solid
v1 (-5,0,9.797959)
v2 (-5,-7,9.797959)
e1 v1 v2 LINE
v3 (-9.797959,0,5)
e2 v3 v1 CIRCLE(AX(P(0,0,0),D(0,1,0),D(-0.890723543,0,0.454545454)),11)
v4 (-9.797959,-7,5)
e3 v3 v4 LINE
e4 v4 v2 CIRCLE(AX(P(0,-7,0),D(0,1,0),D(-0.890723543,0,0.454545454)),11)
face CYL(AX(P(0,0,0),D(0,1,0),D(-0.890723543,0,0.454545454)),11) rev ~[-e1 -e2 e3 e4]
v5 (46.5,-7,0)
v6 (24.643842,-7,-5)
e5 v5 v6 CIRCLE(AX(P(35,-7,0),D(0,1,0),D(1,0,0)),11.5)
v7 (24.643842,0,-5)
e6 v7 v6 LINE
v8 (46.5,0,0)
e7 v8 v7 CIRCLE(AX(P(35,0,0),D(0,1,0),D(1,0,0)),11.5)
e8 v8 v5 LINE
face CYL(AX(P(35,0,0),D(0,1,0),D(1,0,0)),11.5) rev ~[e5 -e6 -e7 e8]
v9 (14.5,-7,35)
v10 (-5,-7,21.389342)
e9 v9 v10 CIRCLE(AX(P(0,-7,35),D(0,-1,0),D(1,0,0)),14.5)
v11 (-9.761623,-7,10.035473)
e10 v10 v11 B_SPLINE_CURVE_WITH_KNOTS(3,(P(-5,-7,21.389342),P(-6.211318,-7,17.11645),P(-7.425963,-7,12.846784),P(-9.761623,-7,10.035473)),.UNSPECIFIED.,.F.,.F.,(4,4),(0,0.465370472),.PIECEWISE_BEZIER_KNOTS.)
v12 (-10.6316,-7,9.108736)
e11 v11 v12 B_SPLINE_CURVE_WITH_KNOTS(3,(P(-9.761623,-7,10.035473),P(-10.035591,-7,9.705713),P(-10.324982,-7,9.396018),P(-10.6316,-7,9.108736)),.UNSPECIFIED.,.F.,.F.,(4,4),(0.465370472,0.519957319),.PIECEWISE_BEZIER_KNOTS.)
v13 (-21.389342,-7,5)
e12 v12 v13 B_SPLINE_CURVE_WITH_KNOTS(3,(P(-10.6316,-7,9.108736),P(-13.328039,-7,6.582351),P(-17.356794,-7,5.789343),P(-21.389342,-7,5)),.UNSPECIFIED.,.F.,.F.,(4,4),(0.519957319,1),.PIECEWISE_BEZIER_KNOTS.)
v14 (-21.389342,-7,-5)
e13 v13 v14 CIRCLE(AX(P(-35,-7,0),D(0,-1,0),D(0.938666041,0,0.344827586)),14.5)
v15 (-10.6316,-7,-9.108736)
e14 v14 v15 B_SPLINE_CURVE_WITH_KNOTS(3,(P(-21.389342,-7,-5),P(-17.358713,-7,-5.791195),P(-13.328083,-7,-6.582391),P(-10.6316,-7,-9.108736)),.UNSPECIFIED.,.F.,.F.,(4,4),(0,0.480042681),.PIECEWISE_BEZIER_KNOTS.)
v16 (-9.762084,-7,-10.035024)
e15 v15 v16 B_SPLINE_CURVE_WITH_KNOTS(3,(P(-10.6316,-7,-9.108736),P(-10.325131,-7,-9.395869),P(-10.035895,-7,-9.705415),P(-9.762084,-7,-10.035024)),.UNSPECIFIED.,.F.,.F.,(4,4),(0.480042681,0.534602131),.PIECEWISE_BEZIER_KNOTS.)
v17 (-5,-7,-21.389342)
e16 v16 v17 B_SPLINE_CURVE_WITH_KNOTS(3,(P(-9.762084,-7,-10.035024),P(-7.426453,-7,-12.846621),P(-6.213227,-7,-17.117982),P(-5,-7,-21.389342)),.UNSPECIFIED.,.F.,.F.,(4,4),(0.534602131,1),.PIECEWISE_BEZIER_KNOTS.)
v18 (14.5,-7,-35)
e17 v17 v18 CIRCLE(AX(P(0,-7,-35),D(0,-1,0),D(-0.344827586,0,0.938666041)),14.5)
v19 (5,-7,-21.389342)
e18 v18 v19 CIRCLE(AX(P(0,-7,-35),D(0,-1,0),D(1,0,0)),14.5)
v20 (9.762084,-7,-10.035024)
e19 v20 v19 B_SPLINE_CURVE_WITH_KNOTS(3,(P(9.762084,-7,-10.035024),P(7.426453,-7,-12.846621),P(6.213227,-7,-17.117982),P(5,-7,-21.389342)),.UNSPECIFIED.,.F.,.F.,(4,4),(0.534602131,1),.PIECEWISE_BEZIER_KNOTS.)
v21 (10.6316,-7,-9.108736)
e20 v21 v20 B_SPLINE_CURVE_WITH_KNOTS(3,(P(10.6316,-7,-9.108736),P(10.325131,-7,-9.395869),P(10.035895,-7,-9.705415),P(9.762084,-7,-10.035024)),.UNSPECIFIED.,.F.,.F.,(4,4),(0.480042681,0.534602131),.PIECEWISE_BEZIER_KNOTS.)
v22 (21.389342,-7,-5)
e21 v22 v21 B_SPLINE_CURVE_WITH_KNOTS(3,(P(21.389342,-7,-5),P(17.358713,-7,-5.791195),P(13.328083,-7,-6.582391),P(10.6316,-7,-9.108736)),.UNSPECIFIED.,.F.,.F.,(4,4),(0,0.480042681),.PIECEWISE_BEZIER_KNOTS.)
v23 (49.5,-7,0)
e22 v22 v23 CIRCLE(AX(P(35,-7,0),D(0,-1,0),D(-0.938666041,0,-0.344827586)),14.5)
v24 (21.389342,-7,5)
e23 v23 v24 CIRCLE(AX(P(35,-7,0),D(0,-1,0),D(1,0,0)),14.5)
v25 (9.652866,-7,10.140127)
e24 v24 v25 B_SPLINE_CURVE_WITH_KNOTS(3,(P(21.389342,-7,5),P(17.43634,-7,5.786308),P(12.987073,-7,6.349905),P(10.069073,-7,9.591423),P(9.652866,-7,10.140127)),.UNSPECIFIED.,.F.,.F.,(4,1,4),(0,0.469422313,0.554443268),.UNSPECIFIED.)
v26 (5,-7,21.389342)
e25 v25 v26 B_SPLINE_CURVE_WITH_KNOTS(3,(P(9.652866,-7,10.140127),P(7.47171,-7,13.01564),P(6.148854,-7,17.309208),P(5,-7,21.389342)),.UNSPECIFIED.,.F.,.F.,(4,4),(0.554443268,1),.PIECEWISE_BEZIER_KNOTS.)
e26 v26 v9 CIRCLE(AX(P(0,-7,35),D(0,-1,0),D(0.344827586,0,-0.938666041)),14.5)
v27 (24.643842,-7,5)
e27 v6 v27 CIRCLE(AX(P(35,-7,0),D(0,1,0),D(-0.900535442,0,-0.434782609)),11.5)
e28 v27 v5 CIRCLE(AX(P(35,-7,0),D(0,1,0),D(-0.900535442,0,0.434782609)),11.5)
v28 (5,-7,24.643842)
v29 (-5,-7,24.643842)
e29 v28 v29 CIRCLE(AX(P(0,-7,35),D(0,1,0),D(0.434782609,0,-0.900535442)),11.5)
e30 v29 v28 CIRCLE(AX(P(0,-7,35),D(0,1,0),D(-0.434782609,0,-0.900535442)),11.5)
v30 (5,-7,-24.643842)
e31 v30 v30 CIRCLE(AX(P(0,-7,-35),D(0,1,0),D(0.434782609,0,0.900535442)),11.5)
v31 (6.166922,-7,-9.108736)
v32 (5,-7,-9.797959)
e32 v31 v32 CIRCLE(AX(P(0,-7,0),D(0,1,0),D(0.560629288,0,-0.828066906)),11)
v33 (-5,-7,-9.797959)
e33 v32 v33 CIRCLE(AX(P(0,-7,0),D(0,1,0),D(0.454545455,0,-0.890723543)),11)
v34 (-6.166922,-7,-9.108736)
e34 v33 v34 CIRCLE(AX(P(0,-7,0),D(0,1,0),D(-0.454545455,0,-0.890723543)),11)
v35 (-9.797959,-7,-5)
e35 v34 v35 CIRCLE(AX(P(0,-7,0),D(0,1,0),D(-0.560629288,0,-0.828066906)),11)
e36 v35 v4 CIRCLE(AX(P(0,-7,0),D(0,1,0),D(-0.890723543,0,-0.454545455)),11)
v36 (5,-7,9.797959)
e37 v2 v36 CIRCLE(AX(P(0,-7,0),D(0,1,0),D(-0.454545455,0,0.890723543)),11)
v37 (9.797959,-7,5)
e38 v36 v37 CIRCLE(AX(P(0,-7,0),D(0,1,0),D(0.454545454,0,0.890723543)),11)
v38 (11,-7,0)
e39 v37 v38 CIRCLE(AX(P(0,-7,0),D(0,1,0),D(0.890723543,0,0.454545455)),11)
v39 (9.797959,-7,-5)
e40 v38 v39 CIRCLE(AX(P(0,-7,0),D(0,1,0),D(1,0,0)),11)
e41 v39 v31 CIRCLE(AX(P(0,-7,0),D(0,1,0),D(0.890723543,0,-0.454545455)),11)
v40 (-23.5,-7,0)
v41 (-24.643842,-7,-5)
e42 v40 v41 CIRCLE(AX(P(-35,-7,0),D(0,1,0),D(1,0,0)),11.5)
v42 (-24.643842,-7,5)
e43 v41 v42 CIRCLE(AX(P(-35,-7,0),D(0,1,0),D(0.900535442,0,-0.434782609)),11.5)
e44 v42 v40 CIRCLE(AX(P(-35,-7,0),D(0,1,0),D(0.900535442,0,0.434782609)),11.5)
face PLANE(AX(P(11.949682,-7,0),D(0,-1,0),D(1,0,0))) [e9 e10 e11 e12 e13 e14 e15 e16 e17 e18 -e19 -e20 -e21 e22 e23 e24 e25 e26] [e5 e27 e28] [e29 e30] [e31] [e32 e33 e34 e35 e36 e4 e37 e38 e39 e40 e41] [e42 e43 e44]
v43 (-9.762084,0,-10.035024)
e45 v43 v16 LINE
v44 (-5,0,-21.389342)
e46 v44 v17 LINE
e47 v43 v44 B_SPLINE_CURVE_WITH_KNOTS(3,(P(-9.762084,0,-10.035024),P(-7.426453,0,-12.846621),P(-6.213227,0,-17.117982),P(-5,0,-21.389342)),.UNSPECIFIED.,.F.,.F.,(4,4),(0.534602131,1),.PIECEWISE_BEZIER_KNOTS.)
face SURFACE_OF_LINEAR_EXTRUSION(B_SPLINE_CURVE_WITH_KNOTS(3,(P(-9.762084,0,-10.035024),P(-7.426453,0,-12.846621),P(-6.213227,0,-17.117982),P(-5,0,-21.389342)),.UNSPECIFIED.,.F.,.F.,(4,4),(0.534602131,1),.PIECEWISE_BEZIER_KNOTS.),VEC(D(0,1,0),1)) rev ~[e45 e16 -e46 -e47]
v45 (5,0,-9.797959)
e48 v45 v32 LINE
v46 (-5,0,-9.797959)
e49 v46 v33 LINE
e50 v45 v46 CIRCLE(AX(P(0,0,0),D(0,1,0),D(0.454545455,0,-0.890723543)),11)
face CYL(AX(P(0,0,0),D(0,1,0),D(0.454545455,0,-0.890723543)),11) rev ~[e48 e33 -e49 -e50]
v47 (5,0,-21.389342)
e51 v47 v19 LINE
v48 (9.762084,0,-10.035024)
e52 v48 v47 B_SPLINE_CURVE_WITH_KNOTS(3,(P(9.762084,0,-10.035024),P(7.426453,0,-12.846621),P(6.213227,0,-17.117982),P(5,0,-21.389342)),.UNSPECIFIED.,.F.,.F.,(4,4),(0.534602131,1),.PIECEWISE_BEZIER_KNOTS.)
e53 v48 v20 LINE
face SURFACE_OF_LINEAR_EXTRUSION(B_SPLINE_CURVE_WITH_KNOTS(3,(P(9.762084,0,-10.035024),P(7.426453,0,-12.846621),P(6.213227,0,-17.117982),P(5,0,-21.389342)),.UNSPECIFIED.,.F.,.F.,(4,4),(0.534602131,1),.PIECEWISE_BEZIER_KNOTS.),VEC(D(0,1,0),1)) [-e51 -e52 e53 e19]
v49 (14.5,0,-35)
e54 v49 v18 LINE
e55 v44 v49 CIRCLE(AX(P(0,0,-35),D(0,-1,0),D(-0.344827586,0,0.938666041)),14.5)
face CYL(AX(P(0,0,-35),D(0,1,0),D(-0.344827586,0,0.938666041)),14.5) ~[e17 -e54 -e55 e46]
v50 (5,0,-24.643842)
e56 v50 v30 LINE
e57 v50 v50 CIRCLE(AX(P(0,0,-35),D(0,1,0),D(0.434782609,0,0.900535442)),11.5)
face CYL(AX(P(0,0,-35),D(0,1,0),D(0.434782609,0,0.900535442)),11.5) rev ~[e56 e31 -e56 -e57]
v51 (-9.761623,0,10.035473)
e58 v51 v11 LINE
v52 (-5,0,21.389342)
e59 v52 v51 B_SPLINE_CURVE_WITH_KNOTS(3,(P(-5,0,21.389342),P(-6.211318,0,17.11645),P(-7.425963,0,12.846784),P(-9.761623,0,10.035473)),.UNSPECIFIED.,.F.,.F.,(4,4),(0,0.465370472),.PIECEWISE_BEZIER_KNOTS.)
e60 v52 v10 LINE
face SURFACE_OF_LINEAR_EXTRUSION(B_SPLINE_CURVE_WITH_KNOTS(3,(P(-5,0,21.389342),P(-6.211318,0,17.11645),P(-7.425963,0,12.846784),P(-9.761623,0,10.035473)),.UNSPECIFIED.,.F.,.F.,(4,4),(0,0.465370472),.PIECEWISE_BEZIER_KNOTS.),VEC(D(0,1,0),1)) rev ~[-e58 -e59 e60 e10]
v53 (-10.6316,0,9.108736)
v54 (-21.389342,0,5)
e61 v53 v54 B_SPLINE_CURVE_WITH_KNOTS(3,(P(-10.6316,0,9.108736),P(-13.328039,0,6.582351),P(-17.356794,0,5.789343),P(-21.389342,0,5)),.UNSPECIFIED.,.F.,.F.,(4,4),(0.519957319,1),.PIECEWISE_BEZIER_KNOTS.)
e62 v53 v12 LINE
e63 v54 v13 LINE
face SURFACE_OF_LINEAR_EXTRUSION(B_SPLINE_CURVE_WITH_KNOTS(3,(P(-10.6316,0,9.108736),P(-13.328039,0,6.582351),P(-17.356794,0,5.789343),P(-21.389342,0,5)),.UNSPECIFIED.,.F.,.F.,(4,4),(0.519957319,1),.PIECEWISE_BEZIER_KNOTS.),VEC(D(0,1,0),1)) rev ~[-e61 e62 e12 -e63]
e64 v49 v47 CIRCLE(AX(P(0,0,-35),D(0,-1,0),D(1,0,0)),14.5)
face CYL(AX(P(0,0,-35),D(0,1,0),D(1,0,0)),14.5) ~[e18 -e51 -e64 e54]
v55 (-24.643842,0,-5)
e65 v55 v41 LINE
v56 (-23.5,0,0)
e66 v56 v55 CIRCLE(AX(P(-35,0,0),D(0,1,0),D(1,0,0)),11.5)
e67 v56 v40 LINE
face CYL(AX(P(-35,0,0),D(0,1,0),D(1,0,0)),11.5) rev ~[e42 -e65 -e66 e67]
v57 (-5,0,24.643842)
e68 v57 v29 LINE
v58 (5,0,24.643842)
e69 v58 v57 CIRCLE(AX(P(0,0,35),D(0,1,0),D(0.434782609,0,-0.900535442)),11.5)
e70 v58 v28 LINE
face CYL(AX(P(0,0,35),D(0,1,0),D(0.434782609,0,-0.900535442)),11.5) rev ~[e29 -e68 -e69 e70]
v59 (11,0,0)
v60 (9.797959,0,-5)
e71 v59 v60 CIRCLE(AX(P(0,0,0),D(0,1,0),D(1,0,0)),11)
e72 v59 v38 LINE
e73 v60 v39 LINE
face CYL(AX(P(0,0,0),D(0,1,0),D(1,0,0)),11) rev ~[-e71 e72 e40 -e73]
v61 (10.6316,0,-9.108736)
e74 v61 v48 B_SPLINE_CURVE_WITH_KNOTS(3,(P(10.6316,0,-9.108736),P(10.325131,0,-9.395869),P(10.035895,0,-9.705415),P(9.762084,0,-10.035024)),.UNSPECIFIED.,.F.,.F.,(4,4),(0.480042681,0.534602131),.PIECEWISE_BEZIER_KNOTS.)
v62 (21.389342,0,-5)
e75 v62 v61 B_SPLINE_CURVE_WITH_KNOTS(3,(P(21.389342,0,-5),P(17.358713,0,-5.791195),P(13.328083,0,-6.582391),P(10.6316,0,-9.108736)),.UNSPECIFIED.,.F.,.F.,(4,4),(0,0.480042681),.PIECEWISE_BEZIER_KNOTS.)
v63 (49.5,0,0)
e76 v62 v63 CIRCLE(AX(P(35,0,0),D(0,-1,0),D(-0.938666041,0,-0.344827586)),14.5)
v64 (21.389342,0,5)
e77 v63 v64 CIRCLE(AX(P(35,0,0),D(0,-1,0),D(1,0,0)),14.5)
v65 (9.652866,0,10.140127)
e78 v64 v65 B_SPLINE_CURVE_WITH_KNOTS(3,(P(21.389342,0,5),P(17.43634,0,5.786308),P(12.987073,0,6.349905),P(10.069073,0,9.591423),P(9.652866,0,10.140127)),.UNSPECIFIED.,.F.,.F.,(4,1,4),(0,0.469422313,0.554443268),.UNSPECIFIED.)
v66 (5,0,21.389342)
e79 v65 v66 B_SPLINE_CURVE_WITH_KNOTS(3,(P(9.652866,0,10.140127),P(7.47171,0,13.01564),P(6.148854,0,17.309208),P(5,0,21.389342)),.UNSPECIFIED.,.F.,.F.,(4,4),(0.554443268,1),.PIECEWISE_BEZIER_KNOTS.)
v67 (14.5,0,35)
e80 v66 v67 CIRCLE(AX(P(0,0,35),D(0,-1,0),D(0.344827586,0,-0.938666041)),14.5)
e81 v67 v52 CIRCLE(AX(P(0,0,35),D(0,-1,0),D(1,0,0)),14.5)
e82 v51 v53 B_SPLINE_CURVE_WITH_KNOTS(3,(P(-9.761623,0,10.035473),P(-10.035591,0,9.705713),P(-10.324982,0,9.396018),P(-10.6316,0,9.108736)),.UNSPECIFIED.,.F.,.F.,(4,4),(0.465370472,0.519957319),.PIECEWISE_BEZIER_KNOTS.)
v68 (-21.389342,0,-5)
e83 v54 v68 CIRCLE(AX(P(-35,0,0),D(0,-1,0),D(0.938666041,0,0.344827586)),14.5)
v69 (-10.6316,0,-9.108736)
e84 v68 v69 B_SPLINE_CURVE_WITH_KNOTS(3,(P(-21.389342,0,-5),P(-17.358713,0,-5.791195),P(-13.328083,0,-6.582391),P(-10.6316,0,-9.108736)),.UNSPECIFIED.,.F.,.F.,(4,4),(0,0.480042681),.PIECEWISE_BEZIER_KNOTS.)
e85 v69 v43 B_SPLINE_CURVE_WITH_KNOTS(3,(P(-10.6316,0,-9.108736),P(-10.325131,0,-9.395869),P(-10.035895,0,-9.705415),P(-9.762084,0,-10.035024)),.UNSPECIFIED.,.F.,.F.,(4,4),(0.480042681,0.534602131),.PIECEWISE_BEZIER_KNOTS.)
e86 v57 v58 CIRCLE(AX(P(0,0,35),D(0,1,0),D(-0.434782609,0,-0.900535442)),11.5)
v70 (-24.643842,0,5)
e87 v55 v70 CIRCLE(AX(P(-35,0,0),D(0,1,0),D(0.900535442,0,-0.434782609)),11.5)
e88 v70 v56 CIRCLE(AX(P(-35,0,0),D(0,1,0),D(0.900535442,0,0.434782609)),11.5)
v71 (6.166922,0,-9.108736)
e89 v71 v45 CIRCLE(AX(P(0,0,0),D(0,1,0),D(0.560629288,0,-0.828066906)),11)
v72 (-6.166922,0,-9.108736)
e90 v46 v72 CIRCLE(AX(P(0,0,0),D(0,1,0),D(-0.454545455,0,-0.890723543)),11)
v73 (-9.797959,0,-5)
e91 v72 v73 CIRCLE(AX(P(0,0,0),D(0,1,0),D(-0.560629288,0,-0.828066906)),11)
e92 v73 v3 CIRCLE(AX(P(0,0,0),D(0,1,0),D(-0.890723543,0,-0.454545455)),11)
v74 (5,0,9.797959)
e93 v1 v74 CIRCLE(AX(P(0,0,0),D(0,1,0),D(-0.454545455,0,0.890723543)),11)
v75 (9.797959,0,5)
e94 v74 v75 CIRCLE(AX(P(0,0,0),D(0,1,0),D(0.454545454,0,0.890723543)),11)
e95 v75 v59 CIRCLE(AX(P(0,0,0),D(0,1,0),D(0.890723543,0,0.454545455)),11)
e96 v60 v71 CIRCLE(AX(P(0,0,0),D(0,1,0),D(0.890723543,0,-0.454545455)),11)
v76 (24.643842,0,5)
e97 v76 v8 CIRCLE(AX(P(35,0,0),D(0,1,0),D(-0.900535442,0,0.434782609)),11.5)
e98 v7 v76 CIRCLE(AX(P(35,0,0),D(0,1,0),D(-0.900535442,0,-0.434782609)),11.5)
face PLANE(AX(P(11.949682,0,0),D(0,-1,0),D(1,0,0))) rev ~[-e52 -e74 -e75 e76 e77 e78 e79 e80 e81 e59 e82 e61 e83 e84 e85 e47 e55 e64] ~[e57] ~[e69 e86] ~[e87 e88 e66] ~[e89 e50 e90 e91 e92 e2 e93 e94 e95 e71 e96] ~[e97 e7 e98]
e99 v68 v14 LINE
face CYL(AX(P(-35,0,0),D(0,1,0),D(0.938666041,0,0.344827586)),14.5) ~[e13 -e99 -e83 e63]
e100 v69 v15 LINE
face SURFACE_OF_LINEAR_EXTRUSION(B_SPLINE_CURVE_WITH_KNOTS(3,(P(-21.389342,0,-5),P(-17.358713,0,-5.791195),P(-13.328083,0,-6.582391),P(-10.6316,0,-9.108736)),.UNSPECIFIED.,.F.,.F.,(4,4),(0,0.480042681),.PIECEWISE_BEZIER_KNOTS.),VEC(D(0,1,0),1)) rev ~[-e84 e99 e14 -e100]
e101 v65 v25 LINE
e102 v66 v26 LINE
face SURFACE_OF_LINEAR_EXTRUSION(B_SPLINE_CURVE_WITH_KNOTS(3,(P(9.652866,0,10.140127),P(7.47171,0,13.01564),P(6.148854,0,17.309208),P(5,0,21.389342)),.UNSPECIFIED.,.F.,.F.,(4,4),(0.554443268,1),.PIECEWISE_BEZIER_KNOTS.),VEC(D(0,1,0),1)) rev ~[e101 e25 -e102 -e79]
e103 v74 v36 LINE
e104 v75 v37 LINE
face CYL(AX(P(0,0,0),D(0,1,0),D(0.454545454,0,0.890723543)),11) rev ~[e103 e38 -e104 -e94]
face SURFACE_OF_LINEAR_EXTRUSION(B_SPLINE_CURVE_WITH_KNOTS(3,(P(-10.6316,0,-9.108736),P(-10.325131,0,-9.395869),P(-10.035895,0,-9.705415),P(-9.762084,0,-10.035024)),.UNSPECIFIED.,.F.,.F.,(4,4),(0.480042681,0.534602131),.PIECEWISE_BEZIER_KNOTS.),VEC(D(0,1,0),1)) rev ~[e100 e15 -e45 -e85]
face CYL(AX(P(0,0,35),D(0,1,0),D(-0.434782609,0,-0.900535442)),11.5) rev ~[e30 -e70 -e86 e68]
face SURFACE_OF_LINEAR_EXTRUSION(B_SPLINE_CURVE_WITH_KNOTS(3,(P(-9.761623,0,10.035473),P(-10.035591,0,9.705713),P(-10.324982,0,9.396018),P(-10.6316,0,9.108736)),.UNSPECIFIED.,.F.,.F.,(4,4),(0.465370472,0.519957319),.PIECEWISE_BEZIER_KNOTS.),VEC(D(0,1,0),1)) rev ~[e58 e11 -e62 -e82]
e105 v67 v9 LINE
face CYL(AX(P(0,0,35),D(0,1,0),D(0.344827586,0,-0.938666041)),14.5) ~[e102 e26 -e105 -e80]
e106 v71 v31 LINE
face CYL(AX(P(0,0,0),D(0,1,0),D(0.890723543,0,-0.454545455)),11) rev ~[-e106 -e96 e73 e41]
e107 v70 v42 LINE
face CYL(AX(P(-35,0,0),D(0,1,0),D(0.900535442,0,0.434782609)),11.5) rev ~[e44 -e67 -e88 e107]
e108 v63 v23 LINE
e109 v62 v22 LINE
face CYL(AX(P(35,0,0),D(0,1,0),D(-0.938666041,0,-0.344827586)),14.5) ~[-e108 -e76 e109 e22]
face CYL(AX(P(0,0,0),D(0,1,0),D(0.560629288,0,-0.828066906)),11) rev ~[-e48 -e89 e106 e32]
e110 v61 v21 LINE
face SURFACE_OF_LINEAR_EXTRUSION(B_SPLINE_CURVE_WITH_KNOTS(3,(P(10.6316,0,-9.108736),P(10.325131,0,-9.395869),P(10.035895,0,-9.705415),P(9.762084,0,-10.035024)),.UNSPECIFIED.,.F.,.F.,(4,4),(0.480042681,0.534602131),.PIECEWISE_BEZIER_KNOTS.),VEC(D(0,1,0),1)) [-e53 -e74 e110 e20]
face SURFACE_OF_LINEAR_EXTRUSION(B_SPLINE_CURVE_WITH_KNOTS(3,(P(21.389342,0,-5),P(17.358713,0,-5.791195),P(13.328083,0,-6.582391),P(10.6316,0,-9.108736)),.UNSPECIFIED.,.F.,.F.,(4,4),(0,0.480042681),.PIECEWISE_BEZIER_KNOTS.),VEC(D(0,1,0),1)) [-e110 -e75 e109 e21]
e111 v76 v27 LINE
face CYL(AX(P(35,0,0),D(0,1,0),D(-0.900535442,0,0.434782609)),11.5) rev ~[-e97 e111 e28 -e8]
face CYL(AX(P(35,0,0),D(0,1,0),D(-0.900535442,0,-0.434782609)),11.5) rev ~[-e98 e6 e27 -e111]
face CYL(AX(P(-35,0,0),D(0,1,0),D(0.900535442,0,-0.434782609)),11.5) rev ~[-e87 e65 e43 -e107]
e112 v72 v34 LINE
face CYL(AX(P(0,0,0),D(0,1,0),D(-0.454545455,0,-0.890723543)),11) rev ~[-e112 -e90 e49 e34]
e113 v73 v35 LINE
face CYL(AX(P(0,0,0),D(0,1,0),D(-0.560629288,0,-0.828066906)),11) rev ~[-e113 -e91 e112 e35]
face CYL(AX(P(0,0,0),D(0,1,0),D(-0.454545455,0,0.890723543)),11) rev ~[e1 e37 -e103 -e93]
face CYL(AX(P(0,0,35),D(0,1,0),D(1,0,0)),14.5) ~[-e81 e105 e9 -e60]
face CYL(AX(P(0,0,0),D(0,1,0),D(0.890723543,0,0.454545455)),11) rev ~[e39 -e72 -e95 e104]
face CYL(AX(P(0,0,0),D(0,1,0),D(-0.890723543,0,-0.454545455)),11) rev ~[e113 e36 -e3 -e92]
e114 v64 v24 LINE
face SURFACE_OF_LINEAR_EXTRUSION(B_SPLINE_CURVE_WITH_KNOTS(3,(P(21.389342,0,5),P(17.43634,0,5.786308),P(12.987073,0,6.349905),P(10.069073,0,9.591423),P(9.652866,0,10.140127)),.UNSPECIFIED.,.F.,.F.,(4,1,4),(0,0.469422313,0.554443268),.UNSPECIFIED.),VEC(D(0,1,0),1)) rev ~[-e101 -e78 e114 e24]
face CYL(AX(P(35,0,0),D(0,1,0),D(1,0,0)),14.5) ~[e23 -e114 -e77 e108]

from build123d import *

# Parameters (mm, degrees)
F1_DEPTH = 7


with BuildPart() as f1:
    # F0 (on Front) → F1 (new body)
    with BuildSketch(Plane.XZ):
        with BuildLine():
            ThreePointArc((9.7979589711, 5), (10.695268783, 2.5712303784), (11, 0))
            ThreePointArc((11, 0), (10.695268783, -2.5712303784), (9.7979589711, -5))
            Line((9.7979589711, -5), (13.0766968306, -5))
            ThreePointArc((13.0766968306, -5), (13.7672392953, -2.542267135), (14, 0))
            ThreePointArc((14, 0), (13.7672392953, 2.542267135), (13.0766968306, 5))
            Line((13.0766968306, 5), (9.7979589711, 5))
        make_face()
        with BuildLine():
            ThreePointArc((5, 9.7979589711), (7.7781745931, 7.7781745931), (9.7979589711, 5))
            Line((9.7979589711, 5), (13.0766968306, 5))
            ThreePointArc((13.0766968306, 5), (12.1766661067, 6.9086035149), (11, 8.6602540378))
            add(Edge.make_bspline(
                [(11, 8.6602540378), (10.5165329788, 9.0943534866), (10.069073109, 9.5914231948), (9.6528657807, 10.1401273276)],
                knots=[0.4694223133, 0.4694223133, 0.4694223133, 0.4694223133, 0.5544432682, 0.5544432682, 0.5544432682, 0.5544432682], degree=3))
            ThreePointArc((9.6528657807, 10.1401273276), (7.4721134232, 11.8392365037), (5, 13.0766968306))
            Line((5, 13.0766968306), (5, 9.7979589711))
        make_face()
        with BuildLine():
            Line((13.0766968306, -5), (9.7979589711, -5))
            ThreePointArc((9.7979589711, -5), (8.2425593884, -7.2842442798), (6.166922169, -9.1087359694))
            Line((6.166922169, -9.1087359694), (10.6316004928, -9.1087359694))
            ThreePointArc((10.6316004928, -9.1087359694), (12.0308465334, -7.1595203533), (13.0766968306, -5))
        make_face()
        with BuildLine():
            ThreePointArc((-5, 9.7979589711), (0, 11), (5, 9.7979589711))
            Line((5, 9.7979589711), (5, 13.0766968306))
            ThreePointArc((5, 13.0766968306), (0, 14), (-5, 13.0766968306))
            Line((-5, 13.0766968306), (-5, 9.7979589711))
        make_face()
        with BuildLine():
            ThreePointArc((11, 8.6602540378), (12.1766661067, 6.9086035149), (13.0766968306, 5))
            Line((13.0766968306, 5), (21.3893424112, 5))
            add(Edge.make_bspline(
                [(21.3893424112, 5), (17.4363397181, 5.7863082094), (13.6693443727, 6.2634805868), (11, 8.6602540378)],
                knots=[0, 0, 0, 0, 0.4694223133, 0.4694223133, 0.4694223133, 0.4694223133], degree=3))
        make_face()
        with BuildLine():
            Line((21.3893424112, 5), (13.0766968306, 5))
            ThreePointArc((13.0766968306, 5), (13.7672392953, 2.542267135), (14, 0))
            ThreePointArc((14, 0), (13.7672392953, -2.542267135), (13.0766968306, -5))
            Line((13.0766968306, -5), (21.3893424112, -5))
            ThreePointArc((21.3893424112, -5), (20.5, 0), (21.3893424112, 5))
        make_face()
        with BuildLine():
            Line((10.6316004928, -9.1087359694), (6.166922169, -9.1087359694))
            ThreePointArc((6.166922169, -9.1087359694), (5.5940856955, -9.4713359792), (5, -9.7979589711))
            Line((5, -9.7979589711), (5, -13.0766968306))
            ThreePointArc((5, -13.0766968306), (7.5360949415, -11.7986131826), (9.7620843684, -10.0350241048))
            add(Edge.make_bspline(
                [(10.6316004928, -9.1087359694), (10.3251306555, -9.395868762), (10.035894736, -9.7054154416), (9.7620843684, -10.0350241048)],
                knots=[0.4800426808, 0.4800426808, 0.4800426808, 0.4800426808, 0.5346021309, 0.5346021309, 0.5346021309, 0.5346021309], degree=3))
        make_face()
        with BuildLine():
            Line((21.3893424112, -5), (13.0766968306, -5))
            ThreePointArc((13.0766968306, -5), (12.0308465334, -7.1595203533), (10.6316004928, -9.1087359694))
            add(Edge.make_bspline(
                [(21.3893424112, -5), (17.3587127001, -5.7911954717), (13.3280829889, -6.5823909435), (10.6316004928, -9.1087359694)],
                knots=[0, 0, 0, 0, 0.4800426808, 0.4800426808, 0.4800426808, 0.4800426808], degree=3))
        make_face()
        with BuildLine():
            ThreePointArc((-9.7979589711, 5), (-7.7781745931, 7.7781745931), (-5, 9.7979589711))
            Line((-5, 9.7979589711), (-5, 13.0766968306))
            ThreePointArc((-5, 13.0766968306), (-7.5358238199, 11.798786351), (-9.7616231696, 10.0354727389))
            add(Edge.make_bspline(
                [(-9.7616231696, 10.0354727389), (-10.0355905847, 9.7057125821), (-10.3249817585, 9.3960175313), (-10.6316004928, 9.1087359694)],
                knots=[0.4653704717, 0.4653704717, 0.4653704717, 0.4653704717, 0.5199573192, 0.5199573192, 0.5199573192, 0.5199573192], degree=3))
            ThreePointArc((-10.6316004928, 9.1087359694), (-12.0308465334, 7.1595203533), (-13.0766968306, 5))
            Line((-13.0766968306, 5), (-9.7979589711, 5))
        make_face()
        with BuildLine():
            ThreePointArc((-5, 13.0766968306), (0, 14), (5, 13.0766968306))
            Line((5, 13.0766968306), (5, 21.3893424112))
            ThreePointArc((5, 21.3893424112), (0, 20.5), (-5, 21.3893424112))
            Line((-5, 21.3893424112), (-5, 13.0766968306))
        make_face()
        with BuildLine():
            Line((5, 21.3893424112), (5, 13.0766968306))
            ThreePointArc((5, 13.0766968306), (7.4721134232, 11.8392365037), (9.6528657807, 10.1401273276))
            add(Edge.make_bspline(
                [(9.6528657807, 10.1401273276), (7.4717096508, 13.0156398459), (6.1488540964, 17.3092084385), (5, 21.3893424112)],
                knots=[0.5544432682, 0.5544432682, 0.5544432682, 0.5544432682, 1, 1, 1, 1], degree=3))
        make_face()
        with BuildLine():
            ThreePointArc((49.5, 0), (37.5392385632, 14.2759331576), (21.3893424112, 5))
            Line((21.3893424112, 5), (24.6438424114, 5))
            ThreePointArc((24.6438424114, 5), (37.5645845405, 11.2103927734), (46.5, 0))
            ThreePointArc((46.5, 0), (37.5645845405, -11.2103927734), (24.6438424114, -5))
            Line((24.6438424114, -5), (21.3893424112, -5))
            ThreePointArc((21.3893424112, -5), (37.5392385632, -14.2759331576), (49.5, 0))
        make_face()
        with BuildLine():
            Line((24.6438424114, 5), (21.3893424112, 5))
            ThreePointArc((21.3893424112, 5), (20.5, 0), (21.3893424112, -5))
            Line((21.3893424112, -5), (24.6438424114, -5))
            ThreePointArc((24.6438424114, -5), (23.5, 0), (24.6438424114, 5))
        make_face()
        with BuildLine():
            Line((5, -13.0766968306), (5, -9.7979589711))
            ThreePointArc((5, -9.7979589711), (0, -11), (-5, -9.7979589711))
            Line((-5, -9.7979589711), (-5, -13.0766968306))
            ThreePointArc((-5, -13.0766968306), (0, -14), (5, -13.0766968306))
        make_face()
        with BuildLine():
            ThreePointArc((-9.7979589711, -5), (-11, 0), (-9.7979589711, 5))
            Line((-9.7979589711, 5), (-13.0766968306, 5))
            ThreePointArc((-13.0766968306, 5), (-14, 0), (-13.0766968306, -5))
            Line((-13.0766968306, -5), (-9.7979589711, -5))
        make_face()
        with BuildLine():
            ThreePointArc((-9.7616231696, 10.0354727389), (-7.5358238199, 11.798786351), (-5, 13.0766968306))
            Line((-5, 13.0766968306), (-5, 21.3893424112))
            add(Edge.make_bspline(
                [(-5, 21.3893424112), (-6.2113181827, 17.1164504192), (-7.4259626407, 12.8467843762), (-9.7616231696, 10.0354727389)],
                knots=[0, 0, 0, 0, 0.4653704717, 0.4653704717, 0.4653704717, 0.4653704717], degree=3))
        make_face()
        with BuildLine():
            ThreePointArc((-5, 21.3893424112), (0, 20.5), (5, 21.3893424112))
            Line((5, 21.3893424112), (5, 24.6438424114))
            ThreePointArc((5, 24.6438424114), (0, 23.5), (-5, 24.6438424114))
            Line((-5, 24.6438424114), (-5, 21.3893424112))
        make_face()
        with BuildLine():
            Line((5, 24.6438424114), (5, 21.3893424112))
            ThreePointArc((5, 21.3893424112), (11.8901219506, 26.7009036637), (14.5, 35))
            ThreePointArc((14.5, 35), (-8.2990963363, 46.8901219506), (-5, 21.3893424112))
            Line((-5, 21.3893424112), (-5, 24.6438424114))
            ThreePointArc((-5, 24.6438424114), (-6.1135096303, 44.7403798694), (11.5, 35))
            ThreePointArc((11.5, 35), (9.7403798694, 28.8864903697), (5, 24.6438424114))
        make_face()
        with BuildLine():
            Line((-5, -13.0766968306), (-5, -9.7979589711))
            ThreePointArc((-5, -9.7979589711), (-5.5940856955, -9.4713359792), (-6.166922169, -9.1087359694))
            Line((-6.166922169, -9.1087359694), (-10.6316004928, -9.1087359694))
            add(Edge.make_bspline(
                [(-10.6316004928, -9.1087359694), (-10.3251306555, -9.395868762), (-10.035894736, -9.7054154416), (-9.7620843684, -10.0350241048)],
                knots=[0.4800426808, 0.4800426808, 0.4800426808, 0.4800426808, 0.5346021309, 0.5346021309, 0.5346021309, 0.5346021309], degree=3))
            ThreePointArc((-9.7620843684, -10.0350241048), (-7.5360949415, -11.7986131826), (-5, -13.0766968306))
        make_face()
        with BuildLine():
            ThreePointArc((9.7620843684, -10.0350241048), (7.5360949415, -11.7986131826), (5, -13.0766968306))
            Line((5, -13.0766968306), (5, -21.3893424112))
            add(Edge.make_bspline(
                [(9.7620843684, -10.0350241048), (7.4264530295, -12.8466207961), (6.2132265148, -17.1179816036), (5, -21.3893424112)],
                knots=[0.5346021309, 0.5346021309, 0.5346021309, 0.5346021309, 1, 1, 1, 1], degree=3))
        make_face()
        with BuildLine():
            Line((5, -21.3893424112), (5, -13.0766968306))
            ThreePointArc((5, -13.0766968306), (0, -14), (-5, -13.0766968306))
            Line((-5, -13.0766968306), (-5, -21.3893424112))
            ThreePointArc((-5, -21.3893424112), (0, -20.5), (5, -21.3893424112))
        make_face()
        with BuildLine():
            ThreePointArc((-6.166922169, -9.1087359694), (-8.2425593884, -7.2842442798), (-9.7979589711, -5))
            Line((-9.7979589711, -5), (-13.0766968306, -5))
            ThreePointArc((-13.0766968306, -5), (-12.0308465334, -7.1595203533), (-10.6316004928, -9.1087359694))
            Line((-10.6316004928, -9.1087359694), (-6.166922169, -9.1087359694))
        make_face()
        with BuildLine():
            ThreePointArc((-13.0766968306, -5), (-14, 0), (-13.0766968306, 5))
            Line((-13.0766968306, 5), (-21.3893424112, 5))
            ThreePointArc((-21.3893424112, 5), (-20.7240668424, 2.5392385632), (-20.5, 0))
            ThreePointArc((-20.5, 0), (-20.7240668424, -2.5392385632), (-21.3893424112, -5))
            Line((-21.3893424112, -5), (-13.0766968306, -5))
        make_face()
        with BuildLine():
            Line((-21.3893424112, 5), (-13.0766968306, 5))
            ThreePointArc((-13.0766968306, 5), (-12.0308465334, 7.1595203533), (-10.6316004928, 9.1087359694))
            add(Edge.make_bspline(
                [(-10.6316004928, 9.1087359694), (-13.3280390276, 6.5823506348), (-17.3567942358, 5.789342747), (-21.3893424112, 5)],
                knots=[0.5199573192, 0.5199573192, 0.5199573192, 0.5199573192, 1, 1, 1, 1], degree=3))
        make_face()
        with BuildLine():
            Line((-5, -21.3893424112), (-5, -13.0766968306))
            ThreePointArc((-5, -13.0766968306), (-7.5360949415, -11.7986131826), (-9.7620843684, -10.0350241048))
            add(Edge.make_bspline(
                [(-9.7620843684, -10.0350241048), (-7.4264530295, -12.8466207961), (-6.2132265148, -17.1179816036), (-5, -21.3893424112)],
                knots=[0.5346021309, 0.5346021309, 0.5346021309, 0.5346021309, 1, 1, 1, 1], degree=3))
        make_face()
        with BuildLine():
            ThreePointArc((14.5, -35), (11.8901219506, -26.7009036637), (5, -21.3893424112))
            Line((5, -21.3893424112), (5, -24.6438424114))
            ThreePointArc((5, -24.6438424114), (9.7403798694, -28.8864903697), (11.5, -35))
            ThreePointArc((11.5, -35), (-6.1135096303, -44.7403798694), (-5, -24.6438424114))
            Line((-5, -24.6438424114), (-5, -21.3893424112))
            ThreePointArc((-5, -21.3893424112), (-8.2990963363, -46.8901219506), (14.5, -35))
        make_face()
        with BuildLine():
            Line((5, -24.6438424114), (5, -21.3893424112))
            ThreePointArc((5, -21.3893424112), (0, -20.5), (-5, -21.3893424112))
            Line((-5, -21.3893424112), (-5, -24.6438424114))
            ThreePointArc((-5, -24.6438424114), (0, -23.5), (5, -24.6438424114))
        make_face()
        with BuildLine():
            ThreePointArc((-10.6316004928, -9.1087359694), (-12.0308465334, -7.1595203533), (-13.0766968306, -5))
            Line((-13.0766968306, -5), (-21.3893424112, -5))
            add(Edge.make_bspline(
                [(-21.3893424112, -5), (-17.3587127001, -5.7911954717), (-13.3280829889, -6.5823909435), (-10.6316004928, -9.1087359694)],
                knots=[0, 0, 0, 0, 0.4800426808, 0.4800426808, 0.4800426808, 0.4800426808], degree=3))
        make_face()
        with BuildLine():
            ThreePointArc((-20.5, 0), (-20.7240668424, 2.5392385632), (-21.3893424112, 5))
            Line((-21.3893424112, 5), (-24.6438424114, 5))
            ThreePointArc((-24.6438424114, 5), (-23.7896072266, 2.5645845405), (-23.5, 0))
            ThreePointArc((-23.5, 0), (-23.7896072266, -2.5645845405), (-24.6438424114, -5))
            Line((-24.6438424114, -5), (-21.3893424112, -5))
            ThreePointArc((-21.3893424112, -5), (-20.7240668424, -2.5392385632), (-20.5, 0))
        make_face()
        with BuildLine():
            Line((-24.6438424114, 5), (-21.3893424112, 5))
            ThreePointArc((-21.3893424112, 5), (-49.5, 0), (-21.3893424112, -5))
            Line((-21.3893424112, -5), (-24.6438424114, -5))
            ThreePointArc((-24.6438424114, -5), (-46.5, 0), (-24.6438424114, 5))
        make_face()
    extrude(amount=F1_DEPTH)


solid = f1.part
